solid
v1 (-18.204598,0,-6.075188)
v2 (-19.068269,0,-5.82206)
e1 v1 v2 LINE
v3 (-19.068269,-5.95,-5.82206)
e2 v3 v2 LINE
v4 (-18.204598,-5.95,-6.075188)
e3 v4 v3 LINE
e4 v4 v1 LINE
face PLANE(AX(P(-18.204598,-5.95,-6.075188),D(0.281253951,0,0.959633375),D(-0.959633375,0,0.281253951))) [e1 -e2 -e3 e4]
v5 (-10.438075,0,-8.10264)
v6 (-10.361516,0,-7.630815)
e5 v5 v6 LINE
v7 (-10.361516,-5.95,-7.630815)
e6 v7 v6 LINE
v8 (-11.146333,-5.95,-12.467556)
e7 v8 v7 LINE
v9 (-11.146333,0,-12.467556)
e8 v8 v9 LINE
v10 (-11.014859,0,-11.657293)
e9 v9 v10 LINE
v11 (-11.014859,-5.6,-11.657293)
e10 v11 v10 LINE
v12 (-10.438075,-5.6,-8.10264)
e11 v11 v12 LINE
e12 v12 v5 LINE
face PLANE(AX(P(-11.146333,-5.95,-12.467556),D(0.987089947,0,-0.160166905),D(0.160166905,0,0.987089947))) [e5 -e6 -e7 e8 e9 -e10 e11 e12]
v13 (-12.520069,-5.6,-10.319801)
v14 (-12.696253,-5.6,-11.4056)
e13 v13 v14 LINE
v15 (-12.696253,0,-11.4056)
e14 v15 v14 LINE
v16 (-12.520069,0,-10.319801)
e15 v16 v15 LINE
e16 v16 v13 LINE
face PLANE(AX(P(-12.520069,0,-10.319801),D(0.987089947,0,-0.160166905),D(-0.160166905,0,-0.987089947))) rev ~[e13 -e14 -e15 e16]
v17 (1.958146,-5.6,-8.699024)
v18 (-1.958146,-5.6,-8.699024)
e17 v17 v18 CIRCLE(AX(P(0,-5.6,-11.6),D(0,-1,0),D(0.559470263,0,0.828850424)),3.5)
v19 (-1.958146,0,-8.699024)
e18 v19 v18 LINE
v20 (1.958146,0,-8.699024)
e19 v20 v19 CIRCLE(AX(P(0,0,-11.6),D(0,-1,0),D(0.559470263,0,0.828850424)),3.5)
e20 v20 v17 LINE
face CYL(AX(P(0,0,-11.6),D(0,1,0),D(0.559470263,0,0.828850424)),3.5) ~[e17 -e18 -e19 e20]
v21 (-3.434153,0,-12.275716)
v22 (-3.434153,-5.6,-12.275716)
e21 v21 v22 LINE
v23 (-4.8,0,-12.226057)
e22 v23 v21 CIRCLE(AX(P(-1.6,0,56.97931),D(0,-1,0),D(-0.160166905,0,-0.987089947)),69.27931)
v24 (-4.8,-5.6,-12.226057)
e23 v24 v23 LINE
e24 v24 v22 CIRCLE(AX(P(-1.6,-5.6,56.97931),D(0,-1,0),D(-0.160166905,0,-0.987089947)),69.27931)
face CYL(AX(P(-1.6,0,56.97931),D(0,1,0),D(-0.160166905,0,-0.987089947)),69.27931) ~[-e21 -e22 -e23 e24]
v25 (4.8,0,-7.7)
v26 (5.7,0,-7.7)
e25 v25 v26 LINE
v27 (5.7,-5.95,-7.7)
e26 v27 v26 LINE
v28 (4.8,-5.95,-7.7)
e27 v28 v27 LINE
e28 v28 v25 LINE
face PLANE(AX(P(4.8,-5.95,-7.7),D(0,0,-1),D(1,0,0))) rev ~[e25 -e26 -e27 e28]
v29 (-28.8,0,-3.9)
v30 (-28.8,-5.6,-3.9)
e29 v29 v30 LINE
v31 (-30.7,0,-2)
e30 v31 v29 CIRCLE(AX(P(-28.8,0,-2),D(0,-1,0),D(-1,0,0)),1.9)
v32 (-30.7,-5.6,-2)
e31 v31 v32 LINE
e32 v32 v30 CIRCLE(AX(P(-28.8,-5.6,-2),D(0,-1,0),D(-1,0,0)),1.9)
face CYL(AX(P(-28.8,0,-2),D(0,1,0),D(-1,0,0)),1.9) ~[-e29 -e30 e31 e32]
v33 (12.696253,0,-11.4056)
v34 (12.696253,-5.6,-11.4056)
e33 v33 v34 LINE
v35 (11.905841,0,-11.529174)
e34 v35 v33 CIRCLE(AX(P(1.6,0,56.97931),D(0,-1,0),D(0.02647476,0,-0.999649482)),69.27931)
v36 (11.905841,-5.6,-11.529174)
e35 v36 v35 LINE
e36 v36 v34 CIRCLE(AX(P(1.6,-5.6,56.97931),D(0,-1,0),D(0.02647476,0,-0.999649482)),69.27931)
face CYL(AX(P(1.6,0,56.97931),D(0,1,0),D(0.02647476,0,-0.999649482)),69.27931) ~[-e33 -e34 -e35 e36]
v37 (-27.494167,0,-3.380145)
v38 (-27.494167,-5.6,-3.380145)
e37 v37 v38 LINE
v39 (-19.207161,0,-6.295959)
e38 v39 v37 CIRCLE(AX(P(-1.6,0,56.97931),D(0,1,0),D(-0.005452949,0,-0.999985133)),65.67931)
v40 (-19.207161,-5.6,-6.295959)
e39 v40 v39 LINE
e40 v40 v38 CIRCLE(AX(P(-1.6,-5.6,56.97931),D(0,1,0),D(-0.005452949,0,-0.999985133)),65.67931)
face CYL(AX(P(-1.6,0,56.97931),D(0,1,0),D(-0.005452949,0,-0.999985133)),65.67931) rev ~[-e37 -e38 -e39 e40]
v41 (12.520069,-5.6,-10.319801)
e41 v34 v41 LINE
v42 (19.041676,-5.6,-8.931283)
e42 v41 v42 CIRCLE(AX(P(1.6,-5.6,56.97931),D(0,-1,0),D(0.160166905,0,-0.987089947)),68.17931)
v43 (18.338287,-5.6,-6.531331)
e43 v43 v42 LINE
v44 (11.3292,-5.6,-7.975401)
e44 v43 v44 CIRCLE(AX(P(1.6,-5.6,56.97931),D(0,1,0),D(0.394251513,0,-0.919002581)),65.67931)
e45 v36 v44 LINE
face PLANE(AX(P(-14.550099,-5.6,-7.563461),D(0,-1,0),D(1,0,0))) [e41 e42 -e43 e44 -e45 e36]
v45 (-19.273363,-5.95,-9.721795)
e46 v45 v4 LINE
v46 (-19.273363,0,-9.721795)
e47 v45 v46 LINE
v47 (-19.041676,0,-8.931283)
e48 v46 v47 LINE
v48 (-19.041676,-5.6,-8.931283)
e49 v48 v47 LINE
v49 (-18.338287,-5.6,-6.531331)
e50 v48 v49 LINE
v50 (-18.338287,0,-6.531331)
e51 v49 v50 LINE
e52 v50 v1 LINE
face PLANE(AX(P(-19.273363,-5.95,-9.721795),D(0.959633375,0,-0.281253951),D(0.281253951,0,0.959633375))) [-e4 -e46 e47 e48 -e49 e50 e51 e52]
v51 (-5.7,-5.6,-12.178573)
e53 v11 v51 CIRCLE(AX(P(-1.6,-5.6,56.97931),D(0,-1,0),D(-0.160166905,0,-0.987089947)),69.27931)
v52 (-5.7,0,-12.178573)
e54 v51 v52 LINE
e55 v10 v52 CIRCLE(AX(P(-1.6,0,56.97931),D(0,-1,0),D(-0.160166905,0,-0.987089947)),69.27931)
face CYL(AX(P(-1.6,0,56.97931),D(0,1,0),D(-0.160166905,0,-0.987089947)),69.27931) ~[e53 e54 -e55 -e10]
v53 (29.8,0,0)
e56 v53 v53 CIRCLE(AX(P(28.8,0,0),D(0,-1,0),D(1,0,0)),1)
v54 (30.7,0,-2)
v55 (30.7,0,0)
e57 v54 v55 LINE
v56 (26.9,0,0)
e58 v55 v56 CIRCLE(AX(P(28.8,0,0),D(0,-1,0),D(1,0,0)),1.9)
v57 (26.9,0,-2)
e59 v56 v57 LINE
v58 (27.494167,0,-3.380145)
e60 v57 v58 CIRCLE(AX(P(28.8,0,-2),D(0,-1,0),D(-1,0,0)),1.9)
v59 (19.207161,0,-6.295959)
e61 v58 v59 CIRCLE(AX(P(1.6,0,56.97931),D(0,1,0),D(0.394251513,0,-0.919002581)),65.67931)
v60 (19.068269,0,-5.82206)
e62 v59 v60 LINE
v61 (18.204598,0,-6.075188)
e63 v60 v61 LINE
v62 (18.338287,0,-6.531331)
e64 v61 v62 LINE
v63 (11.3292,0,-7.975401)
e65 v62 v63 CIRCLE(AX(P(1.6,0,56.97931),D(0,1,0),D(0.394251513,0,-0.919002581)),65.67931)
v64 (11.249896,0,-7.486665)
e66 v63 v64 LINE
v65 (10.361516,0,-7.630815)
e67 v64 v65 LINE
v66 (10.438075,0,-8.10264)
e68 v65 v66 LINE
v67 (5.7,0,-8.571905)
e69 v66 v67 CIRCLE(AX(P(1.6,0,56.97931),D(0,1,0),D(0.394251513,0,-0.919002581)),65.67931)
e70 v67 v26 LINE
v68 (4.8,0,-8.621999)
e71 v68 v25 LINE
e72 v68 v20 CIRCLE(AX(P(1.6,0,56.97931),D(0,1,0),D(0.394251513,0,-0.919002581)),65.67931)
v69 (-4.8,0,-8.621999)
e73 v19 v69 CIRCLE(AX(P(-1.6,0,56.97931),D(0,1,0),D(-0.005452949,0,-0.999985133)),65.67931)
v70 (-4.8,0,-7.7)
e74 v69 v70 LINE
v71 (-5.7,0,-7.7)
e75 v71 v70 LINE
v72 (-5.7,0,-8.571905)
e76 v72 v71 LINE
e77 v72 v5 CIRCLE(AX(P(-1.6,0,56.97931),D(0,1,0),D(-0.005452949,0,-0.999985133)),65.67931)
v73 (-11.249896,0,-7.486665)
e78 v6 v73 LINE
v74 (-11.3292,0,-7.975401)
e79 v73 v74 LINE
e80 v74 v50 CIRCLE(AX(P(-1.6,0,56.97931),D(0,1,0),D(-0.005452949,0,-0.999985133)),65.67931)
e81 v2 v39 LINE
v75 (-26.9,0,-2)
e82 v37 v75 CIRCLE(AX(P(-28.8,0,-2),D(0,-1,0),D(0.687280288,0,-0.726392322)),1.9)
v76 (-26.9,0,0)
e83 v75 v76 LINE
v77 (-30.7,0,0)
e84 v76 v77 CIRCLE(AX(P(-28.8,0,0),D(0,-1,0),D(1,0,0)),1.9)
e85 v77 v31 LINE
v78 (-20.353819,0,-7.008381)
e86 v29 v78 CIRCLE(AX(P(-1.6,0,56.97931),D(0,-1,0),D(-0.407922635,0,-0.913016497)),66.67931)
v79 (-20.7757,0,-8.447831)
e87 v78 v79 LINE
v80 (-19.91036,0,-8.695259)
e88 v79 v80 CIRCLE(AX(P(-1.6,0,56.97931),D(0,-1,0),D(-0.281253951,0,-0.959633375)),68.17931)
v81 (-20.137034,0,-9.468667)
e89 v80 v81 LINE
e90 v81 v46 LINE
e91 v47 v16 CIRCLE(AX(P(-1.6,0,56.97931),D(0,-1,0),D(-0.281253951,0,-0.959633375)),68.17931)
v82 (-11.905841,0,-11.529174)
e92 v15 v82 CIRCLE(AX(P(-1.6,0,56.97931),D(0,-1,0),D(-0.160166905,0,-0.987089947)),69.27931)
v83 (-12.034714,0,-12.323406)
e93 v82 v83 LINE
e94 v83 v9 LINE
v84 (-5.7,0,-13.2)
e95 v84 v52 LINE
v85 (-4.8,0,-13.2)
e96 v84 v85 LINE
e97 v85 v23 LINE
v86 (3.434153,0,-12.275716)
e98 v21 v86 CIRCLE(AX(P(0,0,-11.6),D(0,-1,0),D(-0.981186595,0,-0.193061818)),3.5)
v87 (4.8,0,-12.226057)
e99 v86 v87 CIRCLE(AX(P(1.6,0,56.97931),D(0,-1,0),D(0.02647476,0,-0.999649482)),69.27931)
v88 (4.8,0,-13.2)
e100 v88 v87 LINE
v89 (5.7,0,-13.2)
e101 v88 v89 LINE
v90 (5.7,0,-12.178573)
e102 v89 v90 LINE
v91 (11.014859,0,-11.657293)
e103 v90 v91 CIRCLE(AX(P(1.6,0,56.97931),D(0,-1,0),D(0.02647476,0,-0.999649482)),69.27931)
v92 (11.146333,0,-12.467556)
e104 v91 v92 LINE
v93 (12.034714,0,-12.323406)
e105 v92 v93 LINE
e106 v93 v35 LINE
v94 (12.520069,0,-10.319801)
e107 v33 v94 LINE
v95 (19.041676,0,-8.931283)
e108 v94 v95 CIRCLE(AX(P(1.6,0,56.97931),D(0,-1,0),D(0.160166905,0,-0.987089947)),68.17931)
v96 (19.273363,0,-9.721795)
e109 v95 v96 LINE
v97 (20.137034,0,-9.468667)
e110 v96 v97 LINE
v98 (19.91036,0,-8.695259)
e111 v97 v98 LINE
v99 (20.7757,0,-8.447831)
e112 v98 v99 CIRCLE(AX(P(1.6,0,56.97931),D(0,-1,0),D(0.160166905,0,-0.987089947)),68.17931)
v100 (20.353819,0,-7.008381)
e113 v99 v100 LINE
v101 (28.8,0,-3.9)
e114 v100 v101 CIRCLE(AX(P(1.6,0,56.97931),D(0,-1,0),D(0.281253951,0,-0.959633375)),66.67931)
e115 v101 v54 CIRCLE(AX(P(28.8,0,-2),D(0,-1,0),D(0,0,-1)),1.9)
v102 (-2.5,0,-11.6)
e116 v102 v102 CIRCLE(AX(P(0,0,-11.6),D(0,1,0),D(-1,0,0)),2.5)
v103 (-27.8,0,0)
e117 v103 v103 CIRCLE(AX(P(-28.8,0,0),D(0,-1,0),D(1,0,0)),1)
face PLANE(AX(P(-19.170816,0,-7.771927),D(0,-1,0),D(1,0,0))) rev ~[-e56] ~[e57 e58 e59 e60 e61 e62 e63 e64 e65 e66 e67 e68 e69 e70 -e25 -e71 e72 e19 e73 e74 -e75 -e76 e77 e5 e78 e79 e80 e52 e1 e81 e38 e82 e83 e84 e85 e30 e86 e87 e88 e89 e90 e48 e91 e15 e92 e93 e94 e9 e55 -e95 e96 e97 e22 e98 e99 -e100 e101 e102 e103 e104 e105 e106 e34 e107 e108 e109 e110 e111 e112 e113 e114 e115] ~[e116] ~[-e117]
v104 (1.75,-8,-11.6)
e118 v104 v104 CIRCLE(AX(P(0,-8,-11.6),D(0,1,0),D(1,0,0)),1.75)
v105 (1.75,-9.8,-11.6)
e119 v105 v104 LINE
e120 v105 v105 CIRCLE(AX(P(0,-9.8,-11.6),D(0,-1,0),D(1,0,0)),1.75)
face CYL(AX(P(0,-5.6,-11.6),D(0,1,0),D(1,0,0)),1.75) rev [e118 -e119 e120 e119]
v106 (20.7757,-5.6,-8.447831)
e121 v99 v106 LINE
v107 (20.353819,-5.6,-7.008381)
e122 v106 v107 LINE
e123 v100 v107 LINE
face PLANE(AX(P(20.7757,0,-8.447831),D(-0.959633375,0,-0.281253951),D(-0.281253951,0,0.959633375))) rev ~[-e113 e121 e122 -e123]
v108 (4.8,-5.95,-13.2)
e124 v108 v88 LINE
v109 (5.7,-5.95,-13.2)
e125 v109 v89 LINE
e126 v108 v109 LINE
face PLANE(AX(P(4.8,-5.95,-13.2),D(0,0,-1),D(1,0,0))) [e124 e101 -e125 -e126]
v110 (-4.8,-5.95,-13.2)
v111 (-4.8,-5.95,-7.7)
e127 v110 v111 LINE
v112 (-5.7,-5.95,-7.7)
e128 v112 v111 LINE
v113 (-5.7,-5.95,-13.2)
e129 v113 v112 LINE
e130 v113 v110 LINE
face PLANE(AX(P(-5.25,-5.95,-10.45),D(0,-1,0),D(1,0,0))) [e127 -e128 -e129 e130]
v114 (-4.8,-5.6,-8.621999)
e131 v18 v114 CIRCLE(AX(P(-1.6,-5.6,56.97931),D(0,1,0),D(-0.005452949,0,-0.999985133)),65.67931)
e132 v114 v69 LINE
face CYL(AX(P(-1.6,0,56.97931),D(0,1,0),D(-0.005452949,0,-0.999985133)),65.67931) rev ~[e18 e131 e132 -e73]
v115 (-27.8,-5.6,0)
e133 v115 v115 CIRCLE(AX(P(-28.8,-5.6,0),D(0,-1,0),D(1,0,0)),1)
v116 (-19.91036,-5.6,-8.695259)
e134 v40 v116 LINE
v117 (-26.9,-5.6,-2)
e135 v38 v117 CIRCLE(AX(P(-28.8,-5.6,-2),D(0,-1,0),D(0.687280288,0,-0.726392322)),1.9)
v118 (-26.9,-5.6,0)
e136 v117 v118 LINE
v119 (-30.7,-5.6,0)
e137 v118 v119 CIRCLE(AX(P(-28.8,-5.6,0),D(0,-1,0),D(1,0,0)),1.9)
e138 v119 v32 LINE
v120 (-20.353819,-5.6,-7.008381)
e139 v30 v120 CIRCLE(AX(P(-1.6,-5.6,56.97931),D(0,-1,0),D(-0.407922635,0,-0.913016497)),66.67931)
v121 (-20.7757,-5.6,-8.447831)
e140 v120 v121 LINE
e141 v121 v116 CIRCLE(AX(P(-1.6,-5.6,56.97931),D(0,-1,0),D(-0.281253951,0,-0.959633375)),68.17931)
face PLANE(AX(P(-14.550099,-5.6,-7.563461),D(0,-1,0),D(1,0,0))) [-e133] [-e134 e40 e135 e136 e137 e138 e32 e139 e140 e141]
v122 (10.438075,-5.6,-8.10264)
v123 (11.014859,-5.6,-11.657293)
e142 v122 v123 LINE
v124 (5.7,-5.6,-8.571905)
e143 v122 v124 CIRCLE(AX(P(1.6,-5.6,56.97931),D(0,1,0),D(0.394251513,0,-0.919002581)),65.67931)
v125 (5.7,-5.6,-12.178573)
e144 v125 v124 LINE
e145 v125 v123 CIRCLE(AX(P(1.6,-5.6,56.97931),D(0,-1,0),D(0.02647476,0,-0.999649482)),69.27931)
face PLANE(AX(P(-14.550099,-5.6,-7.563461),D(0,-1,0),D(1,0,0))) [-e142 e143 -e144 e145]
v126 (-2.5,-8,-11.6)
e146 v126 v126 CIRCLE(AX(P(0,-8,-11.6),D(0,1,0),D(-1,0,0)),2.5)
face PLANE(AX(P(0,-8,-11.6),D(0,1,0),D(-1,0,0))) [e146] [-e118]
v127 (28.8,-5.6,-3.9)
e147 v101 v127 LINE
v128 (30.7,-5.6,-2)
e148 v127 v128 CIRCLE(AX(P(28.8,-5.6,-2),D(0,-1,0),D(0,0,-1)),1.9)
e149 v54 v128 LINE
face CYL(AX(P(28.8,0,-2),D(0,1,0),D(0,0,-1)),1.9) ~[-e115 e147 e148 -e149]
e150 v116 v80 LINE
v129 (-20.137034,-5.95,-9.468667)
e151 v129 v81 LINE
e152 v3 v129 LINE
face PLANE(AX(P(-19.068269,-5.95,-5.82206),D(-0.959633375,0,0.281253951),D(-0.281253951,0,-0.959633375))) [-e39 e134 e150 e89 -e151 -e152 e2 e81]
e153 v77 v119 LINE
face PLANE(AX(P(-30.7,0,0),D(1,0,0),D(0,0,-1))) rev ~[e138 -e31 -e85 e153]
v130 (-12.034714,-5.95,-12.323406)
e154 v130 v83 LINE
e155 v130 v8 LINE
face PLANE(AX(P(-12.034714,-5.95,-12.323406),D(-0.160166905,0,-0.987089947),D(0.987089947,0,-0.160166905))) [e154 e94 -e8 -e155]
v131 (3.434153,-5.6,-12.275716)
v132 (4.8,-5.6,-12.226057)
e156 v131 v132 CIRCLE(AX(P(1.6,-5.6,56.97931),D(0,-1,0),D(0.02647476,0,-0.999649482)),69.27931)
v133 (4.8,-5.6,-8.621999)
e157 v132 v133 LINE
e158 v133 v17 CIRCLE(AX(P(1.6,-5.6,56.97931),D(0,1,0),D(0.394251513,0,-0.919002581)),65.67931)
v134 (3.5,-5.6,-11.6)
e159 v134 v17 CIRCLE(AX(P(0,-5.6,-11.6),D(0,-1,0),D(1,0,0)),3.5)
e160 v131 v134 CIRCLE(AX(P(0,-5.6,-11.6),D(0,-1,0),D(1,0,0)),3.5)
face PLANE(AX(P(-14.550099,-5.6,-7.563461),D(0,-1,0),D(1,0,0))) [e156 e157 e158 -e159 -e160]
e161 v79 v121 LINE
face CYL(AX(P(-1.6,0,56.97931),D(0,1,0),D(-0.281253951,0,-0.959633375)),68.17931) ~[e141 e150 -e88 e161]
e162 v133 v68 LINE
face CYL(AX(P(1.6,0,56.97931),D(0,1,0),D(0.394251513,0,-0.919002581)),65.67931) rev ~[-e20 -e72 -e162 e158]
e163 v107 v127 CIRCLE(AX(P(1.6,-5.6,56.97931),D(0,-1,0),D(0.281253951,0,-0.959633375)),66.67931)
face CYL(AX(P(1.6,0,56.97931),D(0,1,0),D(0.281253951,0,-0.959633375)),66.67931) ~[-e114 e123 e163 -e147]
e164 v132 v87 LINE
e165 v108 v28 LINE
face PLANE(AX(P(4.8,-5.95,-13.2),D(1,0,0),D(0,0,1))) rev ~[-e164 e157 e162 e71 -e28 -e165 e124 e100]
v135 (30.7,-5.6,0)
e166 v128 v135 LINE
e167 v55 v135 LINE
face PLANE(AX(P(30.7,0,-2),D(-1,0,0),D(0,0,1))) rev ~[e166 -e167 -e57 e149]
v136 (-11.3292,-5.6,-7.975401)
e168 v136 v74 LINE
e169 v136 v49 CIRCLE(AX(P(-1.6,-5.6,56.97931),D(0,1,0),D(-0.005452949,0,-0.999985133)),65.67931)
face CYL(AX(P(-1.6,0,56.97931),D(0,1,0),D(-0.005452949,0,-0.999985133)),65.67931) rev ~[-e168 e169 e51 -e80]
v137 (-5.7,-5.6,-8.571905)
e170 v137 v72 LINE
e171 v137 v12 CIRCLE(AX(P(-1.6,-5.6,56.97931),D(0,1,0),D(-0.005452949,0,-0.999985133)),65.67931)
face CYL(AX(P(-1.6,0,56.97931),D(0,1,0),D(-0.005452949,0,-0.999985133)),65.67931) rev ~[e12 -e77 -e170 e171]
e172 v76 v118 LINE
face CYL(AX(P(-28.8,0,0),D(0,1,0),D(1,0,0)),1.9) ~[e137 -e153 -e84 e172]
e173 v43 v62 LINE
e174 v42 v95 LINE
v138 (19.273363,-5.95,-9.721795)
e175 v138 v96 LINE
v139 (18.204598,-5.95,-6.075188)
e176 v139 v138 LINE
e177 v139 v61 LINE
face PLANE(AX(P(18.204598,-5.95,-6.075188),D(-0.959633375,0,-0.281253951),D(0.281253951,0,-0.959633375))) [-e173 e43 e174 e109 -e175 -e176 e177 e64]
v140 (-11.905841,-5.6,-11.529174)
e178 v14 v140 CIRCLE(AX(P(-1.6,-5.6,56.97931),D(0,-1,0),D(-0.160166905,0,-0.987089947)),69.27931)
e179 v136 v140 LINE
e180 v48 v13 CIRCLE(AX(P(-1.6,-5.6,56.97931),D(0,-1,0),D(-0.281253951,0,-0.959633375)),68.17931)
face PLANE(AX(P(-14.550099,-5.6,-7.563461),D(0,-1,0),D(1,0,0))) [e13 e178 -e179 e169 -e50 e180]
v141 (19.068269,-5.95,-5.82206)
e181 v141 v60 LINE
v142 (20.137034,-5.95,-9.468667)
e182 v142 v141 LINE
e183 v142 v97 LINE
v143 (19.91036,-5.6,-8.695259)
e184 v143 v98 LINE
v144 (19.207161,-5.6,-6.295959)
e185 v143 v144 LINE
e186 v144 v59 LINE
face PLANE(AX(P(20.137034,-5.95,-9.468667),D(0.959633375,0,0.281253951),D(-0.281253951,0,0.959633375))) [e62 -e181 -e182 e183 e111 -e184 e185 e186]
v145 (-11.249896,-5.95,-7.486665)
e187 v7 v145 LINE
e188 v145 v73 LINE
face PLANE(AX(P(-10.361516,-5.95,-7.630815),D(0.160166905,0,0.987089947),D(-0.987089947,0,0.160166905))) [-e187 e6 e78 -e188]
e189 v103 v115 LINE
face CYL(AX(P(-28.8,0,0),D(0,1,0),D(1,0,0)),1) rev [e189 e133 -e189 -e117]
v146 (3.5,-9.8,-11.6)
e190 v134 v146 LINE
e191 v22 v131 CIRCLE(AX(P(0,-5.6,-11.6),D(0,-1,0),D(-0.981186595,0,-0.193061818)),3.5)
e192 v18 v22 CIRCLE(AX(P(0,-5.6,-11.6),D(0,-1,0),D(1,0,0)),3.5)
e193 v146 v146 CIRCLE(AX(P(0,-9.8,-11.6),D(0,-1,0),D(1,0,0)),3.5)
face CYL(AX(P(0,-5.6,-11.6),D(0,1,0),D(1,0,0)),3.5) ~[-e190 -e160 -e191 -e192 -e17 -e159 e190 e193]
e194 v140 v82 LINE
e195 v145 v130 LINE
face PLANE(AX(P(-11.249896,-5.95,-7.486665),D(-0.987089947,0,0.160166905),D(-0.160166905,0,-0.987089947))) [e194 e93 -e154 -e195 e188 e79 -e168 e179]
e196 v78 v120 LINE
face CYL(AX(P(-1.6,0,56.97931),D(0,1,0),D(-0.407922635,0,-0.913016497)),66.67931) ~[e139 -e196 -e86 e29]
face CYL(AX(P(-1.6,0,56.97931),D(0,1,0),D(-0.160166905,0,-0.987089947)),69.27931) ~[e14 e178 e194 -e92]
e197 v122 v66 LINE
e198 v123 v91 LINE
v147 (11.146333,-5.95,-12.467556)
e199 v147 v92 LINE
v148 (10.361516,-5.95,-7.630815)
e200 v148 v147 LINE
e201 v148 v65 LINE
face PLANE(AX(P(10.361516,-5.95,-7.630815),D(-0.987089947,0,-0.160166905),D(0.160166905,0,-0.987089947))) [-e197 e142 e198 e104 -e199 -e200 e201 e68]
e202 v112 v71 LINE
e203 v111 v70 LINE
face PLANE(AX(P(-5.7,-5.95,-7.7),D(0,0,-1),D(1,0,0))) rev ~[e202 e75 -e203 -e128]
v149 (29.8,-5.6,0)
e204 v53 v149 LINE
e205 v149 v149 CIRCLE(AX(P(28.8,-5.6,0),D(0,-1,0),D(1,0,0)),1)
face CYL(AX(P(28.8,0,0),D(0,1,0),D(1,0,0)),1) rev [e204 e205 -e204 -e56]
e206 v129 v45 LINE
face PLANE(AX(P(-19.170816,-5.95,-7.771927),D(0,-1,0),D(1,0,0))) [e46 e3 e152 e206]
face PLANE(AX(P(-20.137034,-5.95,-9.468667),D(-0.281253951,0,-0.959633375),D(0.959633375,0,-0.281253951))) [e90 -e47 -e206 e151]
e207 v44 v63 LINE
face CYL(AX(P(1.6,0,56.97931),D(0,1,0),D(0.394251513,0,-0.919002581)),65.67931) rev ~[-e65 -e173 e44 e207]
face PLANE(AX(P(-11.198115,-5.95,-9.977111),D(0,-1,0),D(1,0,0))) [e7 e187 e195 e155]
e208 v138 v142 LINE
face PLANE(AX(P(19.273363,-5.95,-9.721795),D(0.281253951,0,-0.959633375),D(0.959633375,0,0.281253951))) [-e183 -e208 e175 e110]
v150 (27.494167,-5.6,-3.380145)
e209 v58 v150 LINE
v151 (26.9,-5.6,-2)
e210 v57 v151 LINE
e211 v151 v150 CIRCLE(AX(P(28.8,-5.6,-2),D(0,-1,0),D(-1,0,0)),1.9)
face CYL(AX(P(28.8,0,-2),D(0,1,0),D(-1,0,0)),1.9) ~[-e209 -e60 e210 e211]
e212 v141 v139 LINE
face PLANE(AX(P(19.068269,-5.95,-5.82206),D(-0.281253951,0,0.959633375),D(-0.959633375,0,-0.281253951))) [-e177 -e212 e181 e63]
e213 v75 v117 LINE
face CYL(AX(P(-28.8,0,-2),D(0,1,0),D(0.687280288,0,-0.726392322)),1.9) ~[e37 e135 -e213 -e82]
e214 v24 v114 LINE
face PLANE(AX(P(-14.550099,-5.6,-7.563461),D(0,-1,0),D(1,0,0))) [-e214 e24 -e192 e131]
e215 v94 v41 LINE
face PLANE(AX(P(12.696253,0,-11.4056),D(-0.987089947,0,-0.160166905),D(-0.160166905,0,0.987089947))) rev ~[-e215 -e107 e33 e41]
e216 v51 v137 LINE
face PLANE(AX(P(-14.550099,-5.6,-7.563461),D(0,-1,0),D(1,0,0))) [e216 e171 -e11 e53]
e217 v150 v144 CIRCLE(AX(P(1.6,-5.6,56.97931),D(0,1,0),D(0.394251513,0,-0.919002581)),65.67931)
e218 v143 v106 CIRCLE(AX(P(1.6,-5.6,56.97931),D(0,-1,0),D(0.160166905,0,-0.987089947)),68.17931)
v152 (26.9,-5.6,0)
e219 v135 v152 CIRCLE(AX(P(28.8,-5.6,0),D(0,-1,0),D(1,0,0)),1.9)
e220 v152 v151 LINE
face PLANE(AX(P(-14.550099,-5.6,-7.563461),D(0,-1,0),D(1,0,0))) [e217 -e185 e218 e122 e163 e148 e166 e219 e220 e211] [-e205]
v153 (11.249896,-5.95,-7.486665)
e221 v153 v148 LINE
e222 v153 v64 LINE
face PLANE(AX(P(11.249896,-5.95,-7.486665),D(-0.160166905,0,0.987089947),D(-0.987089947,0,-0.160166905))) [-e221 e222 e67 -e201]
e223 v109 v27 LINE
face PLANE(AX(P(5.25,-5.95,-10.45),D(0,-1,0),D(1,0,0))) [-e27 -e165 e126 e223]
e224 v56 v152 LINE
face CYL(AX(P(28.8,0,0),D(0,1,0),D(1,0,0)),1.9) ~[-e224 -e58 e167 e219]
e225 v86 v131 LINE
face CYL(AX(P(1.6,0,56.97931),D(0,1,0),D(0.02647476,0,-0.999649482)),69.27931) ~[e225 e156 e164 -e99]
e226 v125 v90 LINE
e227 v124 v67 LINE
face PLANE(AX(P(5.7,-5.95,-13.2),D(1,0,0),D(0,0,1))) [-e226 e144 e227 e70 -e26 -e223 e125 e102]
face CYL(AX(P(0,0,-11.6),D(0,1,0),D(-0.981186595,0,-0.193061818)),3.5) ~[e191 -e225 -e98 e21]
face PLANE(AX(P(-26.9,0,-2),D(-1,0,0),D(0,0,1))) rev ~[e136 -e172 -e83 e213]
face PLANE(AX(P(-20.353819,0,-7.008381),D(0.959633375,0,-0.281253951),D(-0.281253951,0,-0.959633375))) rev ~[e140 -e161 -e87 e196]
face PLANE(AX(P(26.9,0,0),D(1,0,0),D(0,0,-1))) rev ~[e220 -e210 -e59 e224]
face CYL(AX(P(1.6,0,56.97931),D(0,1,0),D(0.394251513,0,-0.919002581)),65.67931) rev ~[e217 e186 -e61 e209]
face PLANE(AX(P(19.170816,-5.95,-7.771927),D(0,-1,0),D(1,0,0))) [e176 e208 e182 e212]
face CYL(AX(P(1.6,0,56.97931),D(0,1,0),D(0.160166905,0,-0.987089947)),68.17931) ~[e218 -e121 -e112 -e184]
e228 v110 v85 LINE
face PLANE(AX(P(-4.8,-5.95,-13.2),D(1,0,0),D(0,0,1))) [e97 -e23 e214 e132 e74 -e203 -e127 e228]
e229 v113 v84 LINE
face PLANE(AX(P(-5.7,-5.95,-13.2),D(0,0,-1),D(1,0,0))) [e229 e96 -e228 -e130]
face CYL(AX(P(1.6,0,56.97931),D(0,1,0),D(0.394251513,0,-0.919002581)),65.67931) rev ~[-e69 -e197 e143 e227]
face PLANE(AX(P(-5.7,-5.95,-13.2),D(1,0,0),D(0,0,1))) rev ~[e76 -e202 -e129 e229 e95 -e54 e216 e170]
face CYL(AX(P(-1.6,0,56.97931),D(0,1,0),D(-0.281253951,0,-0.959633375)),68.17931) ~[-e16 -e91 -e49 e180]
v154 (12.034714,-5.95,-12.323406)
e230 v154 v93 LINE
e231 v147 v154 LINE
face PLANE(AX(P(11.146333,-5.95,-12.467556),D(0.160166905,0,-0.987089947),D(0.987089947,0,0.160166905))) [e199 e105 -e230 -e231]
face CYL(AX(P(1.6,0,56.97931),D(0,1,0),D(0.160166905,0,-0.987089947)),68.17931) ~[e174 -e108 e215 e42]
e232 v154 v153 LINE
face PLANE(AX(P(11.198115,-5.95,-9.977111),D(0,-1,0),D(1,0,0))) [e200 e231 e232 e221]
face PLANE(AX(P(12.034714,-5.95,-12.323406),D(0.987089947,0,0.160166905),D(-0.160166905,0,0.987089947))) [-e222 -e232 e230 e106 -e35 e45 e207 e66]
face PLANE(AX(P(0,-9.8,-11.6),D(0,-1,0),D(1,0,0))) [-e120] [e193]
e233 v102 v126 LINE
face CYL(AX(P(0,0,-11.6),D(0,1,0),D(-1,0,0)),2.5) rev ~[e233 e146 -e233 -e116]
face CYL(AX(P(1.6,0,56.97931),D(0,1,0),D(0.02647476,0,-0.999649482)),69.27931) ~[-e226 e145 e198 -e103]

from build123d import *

# Parameters (mm, degrees)
F0_R     = 1.75
F0_R_2   = 1
F1_DEPTH = 5.6
F3_W     = 0.9
F3_H     = 5.5
F4_DEPTH = 5.95
F5_R     = 3.5
F5_R_2   = 1.75
F6_DEPTH = 4.2
F7_R     = 2.5
F8_DEPTH = 8


with BuildPart() as f1:
    # F0 (on Front) → F1 (new body)
    with BuildSketch(Plane.XZ):
        with BuildLine():
            Line((-26.9, -2), (-26.9, 0))
            ThreePointArc((-26.9, 0), (-28.8, 1.9), (-30.7, 0))
            Line((-30.7, 0), (-30.7, -2))
            ThreePointArc((-30.7, -2), (-30.1435028843, -3.3435028843), (-28.8, -3.9))
            ThreePointArc((-28.8, -3.9), (-24.6294135718, -5.596855554), (-20.3538194655, -7.0083813116))
            Line((-20.3538194655, -7.0083813116), (-20.7757003916, -8.4478313747))
            ThreePointArc((-20.7757003916, -8.4478313747), (-16.6769659984, -9.5120684601), (-12.5200691265, -10.3198014574))
            Line((-12.5200691265, -10.3198014574), (-12.696252722, -11.4056003986))
            ThreePointArc((-12.696252722, -11.4056003986), (-8.0798243817, -11.9962992417), (-3.4341530829, -12.2757163632))
            ThreePointArc((-3.4341530829, -12.2757163632), (0, -15.1), (3.4341530829, -12.2757163632))
            ThreePointArc((3.4341530829, -12.2757163632), (3.235336932, -10.2648614543), (1.9581459203, -8.699023517))
            ThreePointArc((1.9581459203, -8.699023517), (0, -8.1), (-1.9581459203, -8.699023517))
            ThreePointArc((-1.9581459203, -8.699023517), (-14.9928565077, -7.3200147056), (-27.4941674529, -3.3801454123))
            ThreePointArc((-27.4941674529, -3.3801454123), (-27.0548521783, -2.7513049183), (-26.9, -2))
        make_face()
        with Locations((0, -11.6)):
            Circle(F0_R, mode=Mode.SUBTRACT)
        with Locations((-28.8, 0)):
            Circle(F0_R_2, mode=Mode.SUBTRACT)
        with BuildLine():
            ThreePointArc((27.4941674529, -3.3801454123), (14.9928565077, -7.3200147056), (1.9581459203, -8.699023517))
            ThreePointArc((1.9581459203, -8.699023517), (3.235336932, -10.2648614543), (3.4341530829, -12.2757163632))
            ThreePointArc((3.4341530829, -12.2757163632), (8.0798243817, -11.9962992417), (12.696252722, -11.4056003986))
            Line((12.696252722, -11.4056003986), (12.5200691265, -10.3198014574))
            ThreePointArc((12.5200691265, -10.3198014574), (16.6769659984, -9.5120684601), (20.7757003916, -8.4478313747))
            Line((20.7757003916, -8.4478313747), (20.3538194655, -7.0083813116))
            ThreePointArc((20.3538194655, -7.0083813116), (24.6294135718, -5.596855554), (28.8, -3.9))
            ThreePointArc((28.8, -3.9), (30.1435028843, -3.3435028843), (30.7, -2))
            Line((30.7, -2), (30.7, 0))
            ThreePointArc((30.7, 0), (28.8, 1.9), (26.9, 0))
            Line((26.9, 0), (26.9, -2))
            ThreePointArc((26.9, -2), (27.0548521783, -2.7513049183), (27.4941674529, -3.3801454123))
        make_face()
        with Locations((28.8, 0)):
            Circle(F0_R_2, mode=Mode.SUBTRACT)
    extrude(amount=F1_DEPTH)

    # F3 (on offset) → F4 (join, through all)
    with BuildSketch(Plane.XZ.offset(5.95)):
        Polygon((-18.2045984637, -6.0751883598), (-19.0682685015, -5.8220598041), (-20.1370335143, -9.4686666307), (-19.2733634764, -9.7217951863), align=None)
        Polygon((-10.3615155022, -7.6308153564), (-11.2498964541, -7.4866651419), (-12.0347142888, -12.3234058798), (-11.146333337, -12.4675560944), align=None)
        with Locations((-5.25, -10.45)):
            Rectangle(F3_W, F3_H)
        with Locations((5.25, -10.45)):
            Rectangle(F3_W, F3_H)
        Polygon((11.146333337, -12.4675560944), (12.0347142888, -12.3234058798), (11.2498964541, -7.4866651419), (10.3615155022, -7.6308153564), align=None)
        Polygon((20.1370335143, -9.4686666307), (19.0682685015, -5.8220598041), (18.2045984637, -6.0751883598), (19.2733634764, -9.7217951863), align=None)
    extrude(amount=-F4_DEPTH)

    # F5 (on face) → F6 (join)
    with BuildSketch(Plane.XZ.offset(5.6)):
        with Locations((0, -11.6)):
            Circle(F5_R)
        with Locations((0, -11.6)):
            Circle(F5_R_2, mode=Mode.SUBTRACT)
    extrude(amount=F6_DEPTH)

    # F7 (on face) → F8 (cut)
    with BuildSketch(Plane(origin=(0, 0, 0), x_dir=(-1, 0, 0), z_dir=(0, 1, 0))):
        with Locations((0, -11.6)):
            Circle(F7_R)
    extrude(amount=-F8_DEPTH, mode=Mode.SUBTRACT)


solid = f1.part
